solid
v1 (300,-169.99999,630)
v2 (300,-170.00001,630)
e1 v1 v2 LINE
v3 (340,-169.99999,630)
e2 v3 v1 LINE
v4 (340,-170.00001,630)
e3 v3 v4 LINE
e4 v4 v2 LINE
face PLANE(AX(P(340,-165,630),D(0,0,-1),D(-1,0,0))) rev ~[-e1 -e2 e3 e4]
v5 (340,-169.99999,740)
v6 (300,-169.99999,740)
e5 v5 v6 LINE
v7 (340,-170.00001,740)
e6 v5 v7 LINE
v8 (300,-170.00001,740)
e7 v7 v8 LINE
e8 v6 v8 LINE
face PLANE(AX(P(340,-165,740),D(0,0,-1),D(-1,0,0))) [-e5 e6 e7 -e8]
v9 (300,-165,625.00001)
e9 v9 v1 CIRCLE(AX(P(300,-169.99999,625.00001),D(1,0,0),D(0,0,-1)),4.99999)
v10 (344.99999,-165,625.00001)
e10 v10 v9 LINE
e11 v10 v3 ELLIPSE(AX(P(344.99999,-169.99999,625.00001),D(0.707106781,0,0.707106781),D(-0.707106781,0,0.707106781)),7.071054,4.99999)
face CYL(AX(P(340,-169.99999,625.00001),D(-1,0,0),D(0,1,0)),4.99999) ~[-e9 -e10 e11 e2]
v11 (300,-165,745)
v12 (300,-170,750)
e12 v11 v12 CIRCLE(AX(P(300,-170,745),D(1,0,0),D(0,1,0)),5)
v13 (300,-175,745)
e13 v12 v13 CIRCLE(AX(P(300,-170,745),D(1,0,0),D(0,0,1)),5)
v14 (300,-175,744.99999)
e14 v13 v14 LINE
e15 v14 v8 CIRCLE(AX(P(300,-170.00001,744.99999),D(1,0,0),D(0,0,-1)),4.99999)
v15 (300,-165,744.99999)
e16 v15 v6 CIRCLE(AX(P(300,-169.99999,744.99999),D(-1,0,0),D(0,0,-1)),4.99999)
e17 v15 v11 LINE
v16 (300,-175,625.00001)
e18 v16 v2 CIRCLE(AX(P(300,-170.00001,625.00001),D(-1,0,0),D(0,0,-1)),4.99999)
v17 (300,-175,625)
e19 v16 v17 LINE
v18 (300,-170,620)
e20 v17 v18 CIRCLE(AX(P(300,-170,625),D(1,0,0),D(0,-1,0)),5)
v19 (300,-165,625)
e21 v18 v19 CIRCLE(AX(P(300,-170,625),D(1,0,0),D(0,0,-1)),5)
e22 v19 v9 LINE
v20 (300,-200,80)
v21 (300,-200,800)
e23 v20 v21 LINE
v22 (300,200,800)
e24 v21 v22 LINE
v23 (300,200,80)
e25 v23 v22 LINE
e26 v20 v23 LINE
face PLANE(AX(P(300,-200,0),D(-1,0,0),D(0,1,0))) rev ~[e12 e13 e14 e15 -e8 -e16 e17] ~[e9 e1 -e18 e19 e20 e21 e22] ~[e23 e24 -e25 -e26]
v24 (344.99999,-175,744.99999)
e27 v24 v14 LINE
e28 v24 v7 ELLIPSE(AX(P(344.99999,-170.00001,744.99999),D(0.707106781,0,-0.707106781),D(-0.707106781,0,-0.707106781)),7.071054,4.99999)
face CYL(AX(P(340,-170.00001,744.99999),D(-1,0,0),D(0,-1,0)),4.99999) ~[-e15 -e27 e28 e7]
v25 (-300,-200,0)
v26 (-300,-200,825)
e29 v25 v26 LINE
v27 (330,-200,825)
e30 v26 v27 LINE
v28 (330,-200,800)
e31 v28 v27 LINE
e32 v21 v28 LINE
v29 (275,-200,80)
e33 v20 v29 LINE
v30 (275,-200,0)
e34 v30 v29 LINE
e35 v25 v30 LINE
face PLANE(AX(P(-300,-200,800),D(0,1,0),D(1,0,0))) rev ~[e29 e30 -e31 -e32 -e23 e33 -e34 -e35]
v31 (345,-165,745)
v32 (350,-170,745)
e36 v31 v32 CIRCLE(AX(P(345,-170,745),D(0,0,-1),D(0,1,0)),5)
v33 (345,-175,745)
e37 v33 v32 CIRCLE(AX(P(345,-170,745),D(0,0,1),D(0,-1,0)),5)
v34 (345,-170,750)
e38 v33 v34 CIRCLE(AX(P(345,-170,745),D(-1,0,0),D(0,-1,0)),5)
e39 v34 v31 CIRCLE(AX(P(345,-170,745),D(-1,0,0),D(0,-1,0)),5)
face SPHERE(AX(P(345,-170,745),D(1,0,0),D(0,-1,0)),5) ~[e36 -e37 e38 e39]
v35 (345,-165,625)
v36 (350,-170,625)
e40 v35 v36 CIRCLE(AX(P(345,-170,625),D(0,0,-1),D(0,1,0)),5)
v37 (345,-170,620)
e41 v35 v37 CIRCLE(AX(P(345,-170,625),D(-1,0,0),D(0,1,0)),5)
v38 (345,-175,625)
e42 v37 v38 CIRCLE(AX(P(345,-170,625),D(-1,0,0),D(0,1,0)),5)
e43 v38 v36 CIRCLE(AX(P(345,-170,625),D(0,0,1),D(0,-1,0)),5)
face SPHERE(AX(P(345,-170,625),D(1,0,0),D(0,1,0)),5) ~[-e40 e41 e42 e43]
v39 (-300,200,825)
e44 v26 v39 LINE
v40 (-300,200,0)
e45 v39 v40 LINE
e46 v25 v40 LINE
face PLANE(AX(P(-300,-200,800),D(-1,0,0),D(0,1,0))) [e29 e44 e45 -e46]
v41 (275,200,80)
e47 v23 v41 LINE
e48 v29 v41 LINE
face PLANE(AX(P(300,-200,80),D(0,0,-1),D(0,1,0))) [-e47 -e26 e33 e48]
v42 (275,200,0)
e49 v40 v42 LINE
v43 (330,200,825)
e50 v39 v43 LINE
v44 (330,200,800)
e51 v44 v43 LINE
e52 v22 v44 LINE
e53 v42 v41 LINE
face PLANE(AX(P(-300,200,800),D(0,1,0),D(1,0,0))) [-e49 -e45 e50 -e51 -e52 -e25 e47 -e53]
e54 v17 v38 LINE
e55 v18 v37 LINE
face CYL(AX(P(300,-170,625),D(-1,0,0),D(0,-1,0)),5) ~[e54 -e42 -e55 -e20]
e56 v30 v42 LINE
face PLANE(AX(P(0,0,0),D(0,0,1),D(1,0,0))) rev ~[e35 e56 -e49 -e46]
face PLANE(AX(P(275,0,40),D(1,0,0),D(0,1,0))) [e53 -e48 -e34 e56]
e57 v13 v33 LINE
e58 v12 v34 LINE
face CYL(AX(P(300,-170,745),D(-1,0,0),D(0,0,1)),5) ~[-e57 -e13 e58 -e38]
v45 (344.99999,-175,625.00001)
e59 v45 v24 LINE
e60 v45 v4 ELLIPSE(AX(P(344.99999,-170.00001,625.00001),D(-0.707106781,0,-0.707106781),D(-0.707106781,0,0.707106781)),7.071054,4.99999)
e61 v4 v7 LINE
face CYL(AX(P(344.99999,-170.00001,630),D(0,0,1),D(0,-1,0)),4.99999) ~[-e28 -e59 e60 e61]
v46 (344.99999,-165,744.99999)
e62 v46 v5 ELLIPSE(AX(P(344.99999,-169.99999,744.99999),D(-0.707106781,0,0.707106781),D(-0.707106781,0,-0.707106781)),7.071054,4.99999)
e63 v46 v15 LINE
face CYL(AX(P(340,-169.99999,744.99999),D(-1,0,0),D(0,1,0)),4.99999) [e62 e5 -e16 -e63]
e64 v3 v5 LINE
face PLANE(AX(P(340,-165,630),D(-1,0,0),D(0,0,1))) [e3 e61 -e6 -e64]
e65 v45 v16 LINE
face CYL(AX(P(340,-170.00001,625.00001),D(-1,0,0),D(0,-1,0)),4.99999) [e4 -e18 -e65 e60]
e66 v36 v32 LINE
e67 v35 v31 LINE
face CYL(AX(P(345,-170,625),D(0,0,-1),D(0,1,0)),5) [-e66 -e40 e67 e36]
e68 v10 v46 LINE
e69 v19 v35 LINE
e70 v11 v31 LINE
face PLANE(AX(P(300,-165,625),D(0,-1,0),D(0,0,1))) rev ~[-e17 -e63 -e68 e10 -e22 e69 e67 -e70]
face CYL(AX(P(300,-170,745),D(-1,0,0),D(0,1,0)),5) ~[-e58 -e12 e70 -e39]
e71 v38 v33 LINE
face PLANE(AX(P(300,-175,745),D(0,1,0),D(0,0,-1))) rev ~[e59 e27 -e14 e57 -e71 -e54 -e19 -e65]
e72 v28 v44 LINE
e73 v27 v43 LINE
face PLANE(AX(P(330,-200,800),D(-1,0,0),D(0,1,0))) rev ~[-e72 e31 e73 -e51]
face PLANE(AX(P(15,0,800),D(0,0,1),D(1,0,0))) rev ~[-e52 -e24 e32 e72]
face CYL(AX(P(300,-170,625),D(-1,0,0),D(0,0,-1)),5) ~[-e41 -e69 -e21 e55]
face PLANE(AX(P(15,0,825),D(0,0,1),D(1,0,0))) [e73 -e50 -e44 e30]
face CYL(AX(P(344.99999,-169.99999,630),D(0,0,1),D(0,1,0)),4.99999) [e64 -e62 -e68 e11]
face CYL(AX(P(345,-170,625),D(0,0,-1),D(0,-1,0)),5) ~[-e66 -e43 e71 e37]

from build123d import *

# Parameters (mm, degrees)
F0_W        = 600
F0_H        = 400
F1_DEPTH    = 800
F2_W        = 400
F2_H        = 80
F3_DEPTH    = 25
F5_DEPTH    = 50
F6_T1_DEPTH = 120
F6_T4_ANGLE = 180
F6_T6_ANGLE = 180
F7_W        = 40
F7_H        = 110
F8_DEPTH    = 25
F9_R        = 4.99999
F10_W       = 630
F10_H       = 400
F11_DEPTH   = 25


# Not quite as in the source:
# - a fillet or chamfer that OpenCascade refuses, or shapes differently, is made with other operations: its cross-section is extruded or revolved along the edge and cut away or added
# - a fillet or chamfer is up to 0.001 mm smaller than in the source, because OpenCascade refuses the exact size


with BuildPart() as f1:
    # F0 (on Top) → F1 (new body)
    with BuildSketch(Plane.XY):
        Rectangle(F0_W, F0_H)
    extrude(amount=F1_DEPTH)

    # F2 (on face) → F3 (cut)
    with BuildSketch(Plane.YZ.offset(300)):
        with Locations((0, 40)):
            Rectangle(F2_W, F2_H)
    extrude(amount=-F3_DEPTH, mode=Mode.SUBTRACT)

    # F4 (on face) → F5 (join)
    with BuildSketch(Plane.YZ.offset(300)):
        with BuildLine():
            ThreePointArc((-170, 750), (-173.5355339059, 748.5355339059), (-175, 745))
            Line((-175, 745), (-175, 625))
            ThreePointArc((-175, 625), (-173.5355339059, 621.4644660941), (-170, 620))
            ThreePointArc((-170, 620), (-166.4644660941, 621.4644660941), (-165, 625))
            Line((-165, 625), (-165, 745))
            ThreePointArc((-165, 745), (-166.4644660941, 748.5355339059), (-170, 750))
        make_face()
    extrude(amount=F5_DEPTH)

    # F6: fillet of radius 5 on 4 edges, made by hand

    # F6_s2 → F6_t1 (cut)
    with BuildSketch(Plane.XY.offset(625)):
        with BuildLine():
            ThreePointArc((345, -175), (348.5355339059, -173.5355339059), (350, -170))
            Line((350, -170), (350, -175))
            Line((350, -175), (345, -175))
        make_face()
        with BuildLine():
            ThreePointArc((345, -165), (348.5355339059, -166.4644660941), (350, -170))
            Line((350, -170), (350, -165))
            Line((350, -165), (345, -165))
        make_face()
    extrude(amount=F6_T1_DEPTH, mode=Mode.SUBTRACT)

    # F6_s3 → F6_t4 (revolve, cut)
    with BuildSketch(Plane.XY.offset(745)):
        with BuildLine():
            ThreePointArc((345, -175), (348.5355339059, -173.5355339059), (350, -170))
            Line((350, -170), (350, -175))
            Line((350, -175), (345, -175))
        make_face()
    revolve(axis=Axis((350, -170, 745), (-1, 0, 0)), revolution_arc=F6_T4_ANGLE, mode=Mode.SUBTRACT)

    # F6_s5 → F6_t6 (revolve, cut)
    with BuildSketch(Plane.XY.offset(625)):
        with BuildLine():
            ThreePointArc((345, -165), (348.5355339059, -166.4644660941), (350, -170))
            Line((350, -170), (350, -165))
            Line((350, -165), (345, -165))
        make_face()
    revolve(axis=Axis((350, -170, 625), (-1, 0, 0)), revolution_arc=F6_T6_ANGLE, mode=Mode.SUBTRACT)

    # F7 (on face) → F8 (cut)
    with BuildSketch(Plane(origin=(0, -165, 0), x_dir=(-1, 0, 0), z_dir=(0, 1, 0))):
        with Locations((-320, 685)):
            Rectangle(F7_W, F7_H)
    extrude(amount=-F8_DEPTH, mode=Mode.SUBTRACT)

    # F9 (radius 5 in the source; OpenCascade refuses exactly that, so slightly less here)
    f9_edges = [f1.edges().sort_by_distance(p)[0] for p in [
        (320, -165, 740),
        (340, -165, 685),
        (320, -165, 630),
        (320, -175, 740),
        (340, -175, 685),
        (320, -175, 630),
    ]]
    fillet(f9_edges, radius=F9_R)

    # F10 (on face) → F11 (join)
    with BuildSketch(Plane.XY.offset(800)):
        with Locations((15, 0)):
            Rectangle(F10_W, F10_H)
    extrude(amount=F11_DEPTH)


solid = f1.part
